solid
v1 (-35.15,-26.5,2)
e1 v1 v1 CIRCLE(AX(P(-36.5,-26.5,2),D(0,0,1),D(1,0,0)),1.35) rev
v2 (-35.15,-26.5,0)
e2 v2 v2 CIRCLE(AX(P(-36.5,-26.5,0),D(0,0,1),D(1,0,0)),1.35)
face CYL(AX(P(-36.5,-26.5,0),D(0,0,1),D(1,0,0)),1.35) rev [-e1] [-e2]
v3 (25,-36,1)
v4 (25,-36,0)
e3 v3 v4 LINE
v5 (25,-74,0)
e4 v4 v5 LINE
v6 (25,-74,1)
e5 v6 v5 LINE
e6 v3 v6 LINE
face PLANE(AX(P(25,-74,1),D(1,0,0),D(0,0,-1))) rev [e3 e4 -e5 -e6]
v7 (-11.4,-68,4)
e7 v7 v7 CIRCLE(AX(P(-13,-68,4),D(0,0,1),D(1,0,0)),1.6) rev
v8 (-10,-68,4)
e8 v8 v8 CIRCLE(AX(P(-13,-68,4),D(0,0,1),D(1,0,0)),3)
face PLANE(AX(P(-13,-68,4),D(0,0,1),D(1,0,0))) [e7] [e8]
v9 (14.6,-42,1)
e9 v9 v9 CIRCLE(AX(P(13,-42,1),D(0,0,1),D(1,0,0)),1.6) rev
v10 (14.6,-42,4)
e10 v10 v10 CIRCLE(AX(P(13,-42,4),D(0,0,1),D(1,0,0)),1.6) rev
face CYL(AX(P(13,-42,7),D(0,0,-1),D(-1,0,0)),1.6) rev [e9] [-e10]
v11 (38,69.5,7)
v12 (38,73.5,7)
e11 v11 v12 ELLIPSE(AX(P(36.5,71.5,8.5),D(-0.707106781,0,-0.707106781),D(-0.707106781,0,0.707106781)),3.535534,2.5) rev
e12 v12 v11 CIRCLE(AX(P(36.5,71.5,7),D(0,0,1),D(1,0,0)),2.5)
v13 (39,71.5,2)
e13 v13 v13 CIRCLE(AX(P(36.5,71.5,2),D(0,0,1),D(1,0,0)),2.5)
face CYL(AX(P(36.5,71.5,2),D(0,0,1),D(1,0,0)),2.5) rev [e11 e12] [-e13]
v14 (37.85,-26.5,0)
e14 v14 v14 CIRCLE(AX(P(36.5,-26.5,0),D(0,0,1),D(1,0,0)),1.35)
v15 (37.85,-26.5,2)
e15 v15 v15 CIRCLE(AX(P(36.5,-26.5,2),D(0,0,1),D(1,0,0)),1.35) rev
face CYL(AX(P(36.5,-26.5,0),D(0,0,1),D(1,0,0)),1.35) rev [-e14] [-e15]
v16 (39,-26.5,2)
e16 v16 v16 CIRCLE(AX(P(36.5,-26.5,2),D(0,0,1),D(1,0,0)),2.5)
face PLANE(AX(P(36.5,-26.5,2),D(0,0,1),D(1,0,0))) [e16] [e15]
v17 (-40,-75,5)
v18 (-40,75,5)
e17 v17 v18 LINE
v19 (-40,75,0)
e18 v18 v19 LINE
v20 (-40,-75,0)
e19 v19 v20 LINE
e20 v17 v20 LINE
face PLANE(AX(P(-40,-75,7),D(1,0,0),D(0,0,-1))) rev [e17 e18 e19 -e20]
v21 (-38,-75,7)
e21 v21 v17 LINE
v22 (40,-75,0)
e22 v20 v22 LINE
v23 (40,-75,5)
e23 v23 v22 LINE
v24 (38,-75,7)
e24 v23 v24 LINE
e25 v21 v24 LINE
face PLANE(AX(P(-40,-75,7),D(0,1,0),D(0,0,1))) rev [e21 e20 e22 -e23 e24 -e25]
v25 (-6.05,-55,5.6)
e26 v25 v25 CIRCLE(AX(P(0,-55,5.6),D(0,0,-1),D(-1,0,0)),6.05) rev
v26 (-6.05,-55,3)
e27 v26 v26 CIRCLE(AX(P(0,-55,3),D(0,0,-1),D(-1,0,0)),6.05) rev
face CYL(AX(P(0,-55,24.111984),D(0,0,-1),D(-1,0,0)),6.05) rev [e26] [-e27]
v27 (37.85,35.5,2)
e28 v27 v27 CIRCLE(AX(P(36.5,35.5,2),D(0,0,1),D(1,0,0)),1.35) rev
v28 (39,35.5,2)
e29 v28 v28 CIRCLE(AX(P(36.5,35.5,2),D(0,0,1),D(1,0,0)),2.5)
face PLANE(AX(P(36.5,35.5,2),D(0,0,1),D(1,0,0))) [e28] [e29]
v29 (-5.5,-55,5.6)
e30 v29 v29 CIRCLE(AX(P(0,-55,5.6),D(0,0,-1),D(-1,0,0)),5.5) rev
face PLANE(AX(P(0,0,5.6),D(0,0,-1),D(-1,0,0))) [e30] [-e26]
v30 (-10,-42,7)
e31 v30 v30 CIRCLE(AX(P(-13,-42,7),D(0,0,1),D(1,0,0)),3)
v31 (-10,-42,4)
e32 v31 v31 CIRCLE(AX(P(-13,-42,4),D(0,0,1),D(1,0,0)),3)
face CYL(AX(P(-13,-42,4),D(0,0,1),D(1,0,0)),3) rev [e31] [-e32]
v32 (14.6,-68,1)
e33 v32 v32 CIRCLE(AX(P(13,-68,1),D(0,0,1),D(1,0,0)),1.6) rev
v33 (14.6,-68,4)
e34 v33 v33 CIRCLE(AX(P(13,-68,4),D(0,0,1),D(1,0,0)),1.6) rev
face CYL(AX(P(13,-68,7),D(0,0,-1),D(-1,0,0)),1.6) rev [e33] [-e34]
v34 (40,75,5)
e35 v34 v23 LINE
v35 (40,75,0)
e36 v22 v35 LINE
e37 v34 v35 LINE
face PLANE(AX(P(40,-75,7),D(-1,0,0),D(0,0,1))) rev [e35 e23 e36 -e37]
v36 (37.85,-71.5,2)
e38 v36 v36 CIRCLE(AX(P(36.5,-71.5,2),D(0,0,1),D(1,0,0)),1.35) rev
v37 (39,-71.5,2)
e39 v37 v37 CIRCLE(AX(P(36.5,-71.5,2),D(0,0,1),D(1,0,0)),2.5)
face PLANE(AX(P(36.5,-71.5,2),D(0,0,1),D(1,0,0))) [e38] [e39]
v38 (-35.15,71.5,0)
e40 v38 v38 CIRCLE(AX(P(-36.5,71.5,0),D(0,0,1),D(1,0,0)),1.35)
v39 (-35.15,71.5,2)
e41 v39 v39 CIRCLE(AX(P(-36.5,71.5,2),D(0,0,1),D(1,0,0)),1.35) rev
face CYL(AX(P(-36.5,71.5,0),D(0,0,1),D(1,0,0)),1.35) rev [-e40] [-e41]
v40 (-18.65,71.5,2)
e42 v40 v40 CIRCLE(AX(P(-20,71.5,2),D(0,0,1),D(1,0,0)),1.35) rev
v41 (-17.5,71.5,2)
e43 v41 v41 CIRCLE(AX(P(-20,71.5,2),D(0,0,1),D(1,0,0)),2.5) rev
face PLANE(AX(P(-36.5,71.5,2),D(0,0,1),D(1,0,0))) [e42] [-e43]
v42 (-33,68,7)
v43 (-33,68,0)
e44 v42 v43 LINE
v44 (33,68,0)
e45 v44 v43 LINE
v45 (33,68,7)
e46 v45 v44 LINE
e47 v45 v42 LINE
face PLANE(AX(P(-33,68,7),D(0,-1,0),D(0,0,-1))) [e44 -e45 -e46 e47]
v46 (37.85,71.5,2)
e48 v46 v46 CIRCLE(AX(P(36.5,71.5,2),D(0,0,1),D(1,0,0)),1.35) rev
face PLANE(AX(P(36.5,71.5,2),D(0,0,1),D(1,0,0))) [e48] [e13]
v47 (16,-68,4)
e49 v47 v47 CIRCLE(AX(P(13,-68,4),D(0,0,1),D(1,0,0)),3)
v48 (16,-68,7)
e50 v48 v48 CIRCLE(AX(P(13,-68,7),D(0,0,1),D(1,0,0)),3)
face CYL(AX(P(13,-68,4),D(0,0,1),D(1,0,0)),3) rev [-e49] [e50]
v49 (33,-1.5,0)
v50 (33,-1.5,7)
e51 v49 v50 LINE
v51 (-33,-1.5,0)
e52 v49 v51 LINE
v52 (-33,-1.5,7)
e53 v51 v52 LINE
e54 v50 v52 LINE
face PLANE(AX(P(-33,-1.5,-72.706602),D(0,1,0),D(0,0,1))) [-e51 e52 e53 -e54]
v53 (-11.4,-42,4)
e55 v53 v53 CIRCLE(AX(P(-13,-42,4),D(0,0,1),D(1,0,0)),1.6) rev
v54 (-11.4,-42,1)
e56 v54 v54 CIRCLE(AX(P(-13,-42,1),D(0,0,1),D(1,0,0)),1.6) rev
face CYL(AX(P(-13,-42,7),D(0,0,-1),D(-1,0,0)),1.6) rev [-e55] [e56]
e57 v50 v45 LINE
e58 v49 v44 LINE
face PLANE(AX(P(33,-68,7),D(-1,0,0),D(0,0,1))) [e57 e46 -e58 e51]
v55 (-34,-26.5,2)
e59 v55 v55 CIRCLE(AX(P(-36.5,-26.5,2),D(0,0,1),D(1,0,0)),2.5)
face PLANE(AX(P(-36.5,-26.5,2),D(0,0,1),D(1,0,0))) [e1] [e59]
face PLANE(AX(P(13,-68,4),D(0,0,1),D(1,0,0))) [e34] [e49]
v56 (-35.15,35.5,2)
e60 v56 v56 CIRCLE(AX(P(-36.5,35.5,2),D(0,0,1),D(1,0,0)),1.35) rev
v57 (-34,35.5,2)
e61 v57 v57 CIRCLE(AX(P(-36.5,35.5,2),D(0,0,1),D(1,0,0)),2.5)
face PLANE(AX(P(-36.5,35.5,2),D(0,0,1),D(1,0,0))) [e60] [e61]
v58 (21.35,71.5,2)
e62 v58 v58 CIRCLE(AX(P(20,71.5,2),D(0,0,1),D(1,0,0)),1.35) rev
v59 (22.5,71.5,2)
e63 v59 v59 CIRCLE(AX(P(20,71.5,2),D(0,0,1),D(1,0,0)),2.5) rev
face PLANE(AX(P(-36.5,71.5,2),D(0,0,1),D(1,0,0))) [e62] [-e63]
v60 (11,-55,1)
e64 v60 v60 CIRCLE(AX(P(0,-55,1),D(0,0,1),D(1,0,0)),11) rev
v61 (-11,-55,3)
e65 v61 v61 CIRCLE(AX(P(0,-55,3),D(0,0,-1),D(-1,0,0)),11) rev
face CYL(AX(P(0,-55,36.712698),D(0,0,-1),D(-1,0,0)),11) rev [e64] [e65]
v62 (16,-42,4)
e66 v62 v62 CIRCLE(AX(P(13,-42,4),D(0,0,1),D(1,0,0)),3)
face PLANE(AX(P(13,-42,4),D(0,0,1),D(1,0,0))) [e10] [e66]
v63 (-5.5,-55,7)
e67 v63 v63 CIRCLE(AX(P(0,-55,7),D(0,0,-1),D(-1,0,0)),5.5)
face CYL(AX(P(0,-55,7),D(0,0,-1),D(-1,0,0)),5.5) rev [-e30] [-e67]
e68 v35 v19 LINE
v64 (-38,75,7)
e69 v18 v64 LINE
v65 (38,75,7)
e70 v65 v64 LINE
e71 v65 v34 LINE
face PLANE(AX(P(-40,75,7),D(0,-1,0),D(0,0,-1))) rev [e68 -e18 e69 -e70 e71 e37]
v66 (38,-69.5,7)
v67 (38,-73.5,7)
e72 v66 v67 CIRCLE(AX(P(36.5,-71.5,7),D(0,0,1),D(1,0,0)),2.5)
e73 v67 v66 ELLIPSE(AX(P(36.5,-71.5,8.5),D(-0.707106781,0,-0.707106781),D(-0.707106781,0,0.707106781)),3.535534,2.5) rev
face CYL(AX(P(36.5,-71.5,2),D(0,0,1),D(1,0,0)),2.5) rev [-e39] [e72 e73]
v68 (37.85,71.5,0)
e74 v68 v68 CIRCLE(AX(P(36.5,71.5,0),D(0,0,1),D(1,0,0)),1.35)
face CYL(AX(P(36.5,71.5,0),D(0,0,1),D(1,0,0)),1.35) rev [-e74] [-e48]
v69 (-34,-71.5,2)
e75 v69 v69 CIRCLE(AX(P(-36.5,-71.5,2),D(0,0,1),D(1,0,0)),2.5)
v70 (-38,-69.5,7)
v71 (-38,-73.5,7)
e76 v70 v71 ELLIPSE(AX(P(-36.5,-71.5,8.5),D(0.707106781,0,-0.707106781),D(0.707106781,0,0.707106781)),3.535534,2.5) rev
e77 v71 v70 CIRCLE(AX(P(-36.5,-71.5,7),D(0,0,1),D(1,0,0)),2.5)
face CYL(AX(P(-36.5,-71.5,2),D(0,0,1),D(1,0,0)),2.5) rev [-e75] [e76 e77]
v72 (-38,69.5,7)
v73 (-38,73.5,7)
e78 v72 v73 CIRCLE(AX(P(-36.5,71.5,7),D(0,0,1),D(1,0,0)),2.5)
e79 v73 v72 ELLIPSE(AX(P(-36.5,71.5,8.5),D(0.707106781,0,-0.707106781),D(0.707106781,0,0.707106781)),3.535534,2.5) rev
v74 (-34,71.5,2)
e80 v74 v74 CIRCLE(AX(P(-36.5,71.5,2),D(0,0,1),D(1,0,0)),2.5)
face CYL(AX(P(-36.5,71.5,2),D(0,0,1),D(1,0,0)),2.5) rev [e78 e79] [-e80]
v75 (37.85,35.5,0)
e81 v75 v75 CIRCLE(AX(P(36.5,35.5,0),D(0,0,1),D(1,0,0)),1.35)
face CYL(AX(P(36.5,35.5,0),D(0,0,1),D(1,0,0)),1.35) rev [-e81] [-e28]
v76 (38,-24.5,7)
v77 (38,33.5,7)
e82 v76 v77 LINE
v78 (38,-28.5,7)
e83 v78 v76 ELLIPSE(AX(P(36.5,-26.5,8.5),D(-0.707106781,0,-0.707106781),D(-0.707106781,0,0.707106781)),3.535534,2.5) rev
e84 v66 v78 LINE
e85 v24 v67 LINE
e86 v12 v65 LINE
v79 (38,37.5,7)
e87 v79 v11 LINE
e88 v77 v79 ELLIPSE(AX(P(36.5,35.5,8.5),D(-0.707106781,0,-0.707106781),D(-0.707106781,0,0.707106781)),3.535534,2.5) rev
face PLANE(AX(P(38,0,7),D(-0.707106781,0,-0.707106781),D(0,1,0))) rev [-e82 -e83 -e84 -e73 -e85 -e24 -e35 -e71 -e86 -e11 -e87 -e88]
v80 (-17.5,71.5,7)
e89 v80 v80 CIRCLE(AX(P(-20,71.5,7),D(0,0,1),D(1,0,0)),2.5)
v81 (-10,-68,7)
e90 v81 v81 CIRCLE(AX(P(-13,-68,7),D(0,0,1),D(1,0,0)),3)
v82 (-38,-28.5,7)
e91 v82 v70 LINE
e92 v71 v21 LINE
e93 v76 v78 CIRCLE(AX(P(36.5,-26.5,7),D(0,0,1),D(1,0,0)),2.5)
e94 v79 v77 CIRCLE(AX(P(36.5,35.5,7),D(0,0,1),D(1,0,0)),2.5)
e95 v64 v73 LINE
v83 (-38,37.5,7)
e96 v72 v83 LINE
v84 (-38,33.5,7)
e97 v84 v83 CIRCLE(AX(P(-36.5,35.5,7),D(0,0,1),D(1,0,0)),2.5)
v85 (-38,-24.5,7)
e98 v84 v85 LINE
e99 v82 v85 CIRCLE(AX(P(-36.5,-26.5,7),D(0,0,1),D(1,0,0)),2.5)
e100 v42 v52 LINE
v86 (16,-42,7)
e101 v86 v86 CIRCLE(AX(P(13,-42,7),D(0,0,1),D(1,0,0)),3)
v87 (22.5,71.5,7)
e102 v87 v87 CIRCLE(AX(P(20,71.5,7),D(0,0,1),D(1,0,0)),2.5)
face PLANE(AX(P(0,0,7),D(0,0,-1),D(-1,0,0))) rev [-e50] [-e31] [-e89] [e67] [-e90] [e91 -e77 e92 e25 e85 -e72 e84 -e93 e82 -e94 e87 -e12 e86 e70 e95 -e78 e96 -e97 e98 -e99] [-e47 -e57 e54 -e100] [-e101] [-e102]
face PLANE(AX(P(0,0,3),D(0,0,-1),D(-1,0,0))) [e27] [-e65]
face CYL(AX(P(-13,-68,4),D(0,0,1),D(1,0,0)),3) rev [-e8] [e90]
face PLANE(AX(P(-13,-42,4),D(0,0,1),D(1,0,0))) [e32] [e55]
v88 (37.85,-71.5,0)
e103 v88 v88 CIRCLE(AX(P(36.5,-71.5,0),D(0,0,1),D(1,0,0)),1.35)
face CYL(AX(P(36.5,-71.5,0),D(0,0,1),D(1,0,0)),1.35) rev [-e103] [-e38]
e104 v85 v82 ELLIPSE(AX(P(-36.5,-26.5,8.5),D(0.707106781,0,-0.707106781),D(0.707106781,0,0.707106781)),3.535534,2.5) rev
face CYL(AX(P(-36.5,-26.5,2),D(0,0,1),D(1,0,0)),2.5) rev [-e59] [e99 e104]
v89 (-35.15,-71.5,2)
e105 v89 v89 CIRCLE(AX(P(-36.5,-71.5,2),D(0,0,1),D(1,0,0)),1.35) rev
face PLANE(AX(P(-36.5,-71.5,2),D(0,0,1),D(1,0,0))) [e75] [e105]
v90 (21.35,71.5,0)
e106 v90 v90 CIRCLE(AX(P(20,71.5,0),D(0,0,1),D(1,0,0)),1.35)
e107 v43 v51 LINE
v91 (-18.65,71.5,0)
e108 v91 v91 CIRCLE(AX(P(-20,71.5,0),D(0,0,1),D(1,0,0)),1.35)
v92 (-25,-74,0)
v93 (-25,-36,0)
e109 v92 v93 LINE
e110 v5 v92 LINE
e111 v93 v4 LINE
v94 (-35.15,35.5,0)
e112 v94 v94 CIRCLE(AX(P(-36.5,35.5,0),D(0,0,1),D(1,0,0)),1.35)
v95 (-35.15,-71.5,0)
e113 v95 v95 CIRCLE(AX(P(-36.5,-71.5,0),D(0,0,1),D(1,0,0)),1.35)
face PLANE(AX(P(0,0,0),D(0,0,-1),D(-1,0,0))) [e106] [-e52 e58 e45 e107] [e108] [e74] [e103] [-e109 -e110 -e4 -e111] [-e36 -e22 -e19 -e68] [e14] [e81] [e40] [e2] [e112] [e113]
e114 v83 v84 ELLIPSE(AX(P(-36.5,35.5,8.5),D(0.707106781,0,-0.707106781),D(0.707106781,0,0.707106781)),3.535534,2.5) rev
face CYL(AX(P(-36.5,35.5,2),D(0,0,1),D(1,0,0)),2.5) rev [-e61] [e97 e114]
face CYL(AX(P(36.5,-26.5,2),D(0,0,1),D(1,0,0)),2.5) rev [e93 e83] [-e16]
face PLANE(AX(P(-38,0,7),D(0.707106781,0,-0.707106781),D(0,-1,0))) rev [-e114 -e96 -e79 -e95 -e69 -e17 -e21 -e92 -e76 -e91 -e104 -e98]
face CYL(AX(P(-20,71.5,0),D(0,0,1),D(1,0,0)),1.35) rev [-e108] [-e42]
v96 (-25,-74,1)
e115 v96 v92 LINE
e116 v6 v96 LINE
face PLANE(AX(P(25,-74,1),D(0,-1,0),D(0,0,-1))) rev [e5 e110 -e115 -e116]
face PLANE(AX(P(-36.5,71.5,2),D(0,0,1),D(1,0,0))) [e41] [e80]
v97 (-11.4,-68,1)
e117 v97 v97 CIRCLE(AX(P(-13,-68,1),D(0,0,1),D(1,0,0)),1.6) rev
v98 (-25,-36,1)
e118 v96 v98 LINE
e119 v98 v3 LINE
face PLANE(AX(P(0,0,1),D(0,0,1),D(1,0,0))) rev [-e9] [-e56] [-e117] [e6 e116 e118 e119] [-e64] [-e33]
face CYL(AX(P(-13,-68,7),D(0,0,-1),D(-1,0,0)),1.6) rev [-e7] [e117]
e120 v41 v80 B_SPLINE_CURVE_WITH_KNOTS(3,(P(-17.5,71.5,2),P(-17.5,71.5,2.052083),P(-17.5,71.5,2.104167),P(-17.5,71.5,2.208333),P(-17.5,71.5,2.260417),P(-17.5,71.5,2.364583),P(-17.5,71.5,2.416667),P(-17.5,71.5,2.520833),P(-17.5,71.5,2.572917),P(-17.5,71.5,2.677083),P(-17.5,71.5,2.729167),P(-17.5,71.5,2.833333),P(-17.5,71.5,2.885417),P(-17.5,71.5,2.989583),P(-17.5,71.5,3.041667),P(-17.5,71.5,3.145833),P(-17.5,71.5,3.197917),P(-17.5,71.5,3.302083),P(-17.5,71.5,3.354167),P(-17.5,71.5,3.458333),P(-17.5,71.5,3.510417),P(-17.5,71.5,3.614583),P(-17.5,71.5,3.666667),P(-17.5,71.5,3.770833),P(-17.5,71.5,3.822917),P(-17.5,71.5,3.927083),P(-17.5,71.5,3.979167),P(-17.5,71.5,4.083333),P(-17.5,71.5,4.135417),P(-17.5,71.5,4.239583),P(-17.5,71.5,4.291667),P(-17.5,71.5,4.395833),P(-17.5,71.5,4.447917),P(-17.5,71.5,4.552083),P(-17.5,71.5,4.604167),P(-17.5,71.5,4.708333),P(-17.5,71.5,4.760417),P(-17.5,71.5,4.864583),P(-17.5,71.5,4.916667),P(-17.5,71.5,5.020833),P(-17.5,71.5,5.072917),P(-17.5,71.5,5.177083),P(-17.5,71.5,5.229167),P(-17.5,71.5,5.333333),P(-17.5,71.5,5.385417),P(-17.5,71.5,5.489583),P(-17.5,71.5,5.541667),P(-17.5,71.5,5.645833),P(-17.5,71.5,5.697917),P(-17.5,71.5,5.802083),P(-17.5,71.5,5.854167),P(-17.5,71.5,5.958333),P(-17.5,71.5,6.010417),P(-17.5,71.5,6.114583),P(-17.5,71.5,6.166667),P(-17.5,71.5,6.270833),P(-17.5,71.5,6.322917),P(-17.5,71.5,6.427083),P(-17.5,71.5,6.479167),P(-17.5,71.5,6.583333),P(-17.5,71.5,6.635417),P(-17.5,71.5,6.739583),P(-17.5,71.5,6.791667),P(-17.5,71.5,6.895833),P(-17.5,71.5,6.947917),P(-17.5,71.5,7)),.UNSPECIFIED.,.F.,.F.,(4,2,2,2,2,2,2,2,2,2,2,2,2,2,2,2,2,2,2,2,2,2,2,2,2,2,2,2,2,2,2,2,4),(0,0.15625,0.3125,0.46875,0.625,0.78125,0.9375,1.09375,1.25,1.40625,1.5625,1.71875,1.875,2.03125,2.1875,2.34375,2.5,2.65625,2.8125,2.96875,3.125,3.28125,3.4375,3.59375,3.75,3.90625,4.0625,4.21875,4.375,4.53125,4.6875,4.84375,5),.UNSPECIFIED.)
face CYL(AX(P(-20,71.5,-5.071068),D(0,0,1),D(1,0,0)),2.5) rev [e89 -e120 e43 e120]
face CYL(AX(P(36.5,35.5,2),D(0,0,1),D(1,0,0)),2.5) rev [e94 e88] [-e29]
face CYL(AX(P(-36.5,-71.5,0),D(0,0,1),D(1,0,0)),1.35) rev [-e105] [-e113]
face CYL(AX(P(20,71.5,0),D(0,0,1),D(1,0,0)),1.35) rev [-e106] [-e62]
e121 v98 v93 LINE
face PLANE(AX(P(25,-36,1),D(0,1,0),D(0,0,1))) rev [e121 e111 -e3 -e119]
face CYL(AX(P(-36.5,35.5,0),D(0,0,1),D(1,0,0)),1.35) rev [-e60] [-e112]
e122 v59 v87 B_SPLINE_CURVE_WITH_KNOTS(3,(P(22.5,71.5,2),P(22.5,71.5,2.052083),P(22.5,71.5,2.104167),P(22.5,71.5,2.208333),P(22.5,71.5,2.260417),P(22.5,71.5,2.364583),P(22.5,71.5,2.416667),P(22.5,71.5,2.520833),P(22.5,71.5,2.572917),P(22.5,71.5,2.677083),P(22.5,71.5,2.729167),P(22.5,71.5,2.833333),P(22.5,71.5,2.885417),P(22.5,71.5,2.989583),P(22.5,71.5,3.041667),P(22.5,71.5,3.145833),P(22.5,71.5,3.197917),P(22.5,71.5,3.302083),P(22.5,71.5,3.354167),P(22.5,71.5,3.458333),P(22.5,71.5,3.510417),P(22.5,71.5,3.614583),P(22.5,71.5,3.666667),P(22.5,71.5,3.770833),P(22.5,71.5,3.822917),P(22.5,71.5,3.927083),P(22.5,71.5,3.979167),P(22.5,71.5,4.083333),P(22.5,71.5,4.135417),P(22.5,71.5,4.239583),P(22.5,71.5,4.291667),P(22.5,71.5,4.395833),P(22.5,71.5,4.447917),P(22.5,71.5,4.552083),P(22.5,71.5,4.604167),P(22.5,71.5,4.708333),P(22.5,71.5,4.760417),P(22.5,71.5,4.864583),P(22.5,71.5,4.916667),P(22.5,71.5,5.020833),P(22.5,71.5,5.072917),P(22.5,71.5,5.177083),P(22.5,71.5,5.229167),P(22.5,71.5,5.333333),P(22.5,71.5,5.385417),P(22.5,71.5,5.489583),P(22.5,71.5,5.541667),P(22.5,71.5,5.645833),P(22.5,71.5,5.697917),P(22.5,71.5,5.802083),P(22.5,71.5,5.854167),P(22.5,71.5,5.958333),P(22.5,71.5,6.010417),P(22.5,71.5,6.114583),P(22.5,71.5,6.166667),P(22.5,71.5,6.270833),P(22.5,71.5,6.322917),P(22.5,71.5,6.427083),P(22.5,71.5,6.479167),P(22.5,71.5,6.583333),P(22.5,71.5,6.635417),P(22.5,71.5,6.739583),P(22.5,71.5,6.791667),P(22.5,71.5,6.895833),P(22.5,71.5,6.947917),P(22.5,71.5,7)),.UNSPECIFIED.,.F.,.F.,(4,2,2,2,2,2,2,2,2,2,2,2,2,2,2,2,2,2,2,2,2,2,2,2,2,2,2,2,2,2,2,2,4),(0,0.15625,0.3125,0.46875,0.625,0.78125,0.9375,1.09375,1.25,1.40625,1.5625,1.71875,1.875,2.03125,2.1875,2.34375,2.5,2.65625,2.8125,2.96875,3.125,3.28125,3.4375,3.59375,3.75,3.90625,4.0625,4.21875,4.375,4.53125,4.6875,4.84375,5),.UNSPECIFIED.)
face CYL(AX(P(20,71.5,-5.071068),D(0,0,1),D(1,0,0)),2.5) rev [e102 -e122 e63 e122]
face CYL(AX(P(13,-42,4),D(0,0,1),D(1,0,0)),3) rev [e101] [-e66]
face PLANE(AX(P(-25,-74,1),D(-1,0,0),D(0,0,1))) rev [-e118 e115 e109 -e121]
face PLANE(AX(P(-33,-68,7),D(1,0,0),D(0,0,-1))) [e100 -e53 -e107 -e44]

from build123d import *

# Parameters (mm, degrees)
SKETCH1_W           = 80
SKETCH1_H           = 150
SKETCH1_W_2         = 66
SKETCH1_H_2         = 136
BOSS_EXTRUDE1_DEPTH = 7
SKETCH2_W           = 66
SKETCH2_H           = 36
BOSS_EXTRUDE2_DEPTH = 7
SKETCH3_R           = 5.5
CUT_EXTRUDE1_DEPTH  = 86.287748241
SKETCH4_R           = 6.05
CUT_EXTRUDE2_DEPTH  = 5.6
SKETCH5_R           = 11
CUT_EXTRUDE3_DEPTH  = 3
SKETCH6_R           = 1.6
CUT_EXTRUDE4_DEPTH  = 86.287748241
SKETCH7_W           = 50
SKETCH7_H           = 38
CUT_EXTRUDE5_DEPTH  = 1
SKETCH8_R           = 3
CUT_EXTRUDE6_DEPTH  = 3
SKETCH9_R           = 1.35
CUT_EXTRUDE7_DEPTH  = 86.287748241
SKETCH10_R          = 2.5
CUT_EXTRUDE8_DEPTH  = 5
CHAMFER1_SIZE       = 2
SKETCH11_W          = 66
SKETCH11_H          = 30.5
BOSS_EXTRUDE3_DEPTH = 7
SKETCH12_R          = 1.35
CUT_EXTRUDE9_DEPTH  = 86.287748241
SKETCH13_R          = 2.5
CUT_EXTRUDE10_DEPTH = 5


with BuildPart() as part:
    # Sketch1 → Boss-Extrude1 (new body)
    with BuildSketch(Plane.XY):
        Rectangle(SKETCH1_W, SKETCH1_H)
        Rectangle(SKETCH1_W_2, SKETCH1_H_2, mode=Mode.SUBTRACT)
    extrude(amount=BOSS_EXTRUDE1_DEPTH)

    # Sketch2 → Boss-Extrude2 (add)
    with BuildSketch(Plane.XY.offset(7)):
        with Locations((0, -50)):
            Rectangle(SKETCH2_W, SKETCH2_H)
    extrude(amount=-BOSS_EXTRUDE2_DEPTH)

    # Sketch3 → Cut-Extrude1 (cut, through all)
    with BuildSketch(Plane(origin=(0, 0, 0), x_dir=(-1, 0, 0), z_dir=(0, 0, -1))):
        with Locations((0, -55)):
            Circle(SKETCH3_R)
    extrude(amount=-CUT_EXTRUDE1_DEPTH, mode=Mode.SUBTRACT)

    # Sketch4 → Cut-Extrude2 (cut)
    with BuildSketch(Plane(origin=(0, 0, 0), x_dir=(-1, 0, 0), z_dir=(0, 0, -1))):
        with Locations((0, -55)):
            Circle(SKETCH4_R)
    extrude(amount=-CUT_EXTRUDE2_DEPTH, mode=Mode.SUBTRACT)

    # Sketch5 → Cut-Extrude3 (cut)
    with BuildSketch(Plane(origin=(0, 0, 0), x_dir=(-1, 0, 0), z_dir=(0, 0, -1))):
        with Locations((0, -55)):
            Circle(SKETCH5_R)
    extrude(amount=-CUT_EXTRUDE3_DEPTH, mode=Mode.SUBTRACT)

    # Sketch6 → Cut-Extrude4 (cut, through all)
    with BuildSketch(Plane(origin=(0, 0, 0), x_dir=(-1, 0, 0), z_dir=(0, 0, -1))):
        with Locations((-13, -42)):
            Circle(SKETCH6_R)
        with Locations((13, -42)):
            Circle(SKETCH6_R)
        with Locations((13, -68)):
            Circle(SKETCH6_R)
        with Locations((-13, -68)):
            Circle(SKETCH6_R)
    extrude(amount=-CUT_EXTRUDE4_DEPTH, mode=Mode.SUBTRACT)

    # Sketch7 → Cut-Extrude5 (cut)
    with BuildSketch(Plane(origin=(0, 0, 0), x_dir=(-1, 0, 0), z_dir=(0, 0, -1))):
        with Locations((0, -55)):
            Rectangle(SKETCH7_W, SKETCH7_H)
    extrude(amount=-CUT_EXTRUDE5_DEPTH, mode=Mode.SUBTRACT)

    # Sketch8 → Cut-Extrude6 (cut)
    with BuildSketch(Plane.XY.offset(7)):
        with Locations((-13, -42)):
            Circle(SKETCH8_R)
        with Locations((13, -42)):
            Circle(SKETCH8_R)
        with Locations((13, -68)):
            Circle(SKETCH8_R)
        with Locations((-13, -68)):
            Circle(SKETCH8_R)
    extrude(amount=-CUT_EXTRUDE6_DEPTH, mode=Mode.SUBTRACT)

    # Sketch9 → Cut-Extrude7 (cut, through all)
    with BuildSketch(Plane.XY.offset(7)):
        with Locations((-36.5, 71.5)):
            Circle(SKETCH9_R)
        with Locations((36.5, 71.5)):
            Circle(SKETCH9_R)
        with Locations((-36.5, -71.5)):
            Circle(SKETCH9_R)
        with Locations((36.5, -71.5)):
            Circle(SKETCH9_R)
        with Locations((-36.5, 35.5)):
            Circle(SKETCH9_R)
        with Locations((36.5, 35.5)):
            Circle(SKETCH9_R)
        with Locations((36.5, -26.5)):
            Circle(SKETCH9_R)
        with Locations((-36.5, -26.5)):
            Circle(SKETCH9_R)
    extrude(amount=-CUT_EXTRUDE7_DEPTH, mode=Mode.SUBTRACT)

    # Sketch10 → Cut-Extrude8 (cut)
    with BuildSketch(Plane.XY.offset(7)):
        with Locations((-36.5, 71.5)):
            Circle(SKETCH10_R)
        with Locations((36.5, 35.5)):
            Circle(SKETCH10_R)
        with Locations((-36.5, 35.5)):
            Circle(SKETCH10_R)
        with Locations((36.5, 71.5)):
            Circle(SKETCH10_R)
        with Locations((-36.5, -71.5)):
            Circle(SKETCH10_R)
        with Locations((36.5, -71.5)):
            Circle(SKETCH10_R)
        with Locations((-36.5, -26.5)):
            Circle(SKETCH10_R)
        with Locations((36.5, -26.5)):
            Circle(SKETCH10_R)
    extrude(amount=-CUT_EXTRUDE8_DEPTH, mode=Mode.SUBTRACT)

    # Chamfer1
    # the kernel refuses this chamfer: 2 mm, written as the material it takes off along each edge
    with BuildSketch(Plane(origin=(-40, 80.143365976, 7), x_dir=(-0.027495876610585623, 0, -0.9996219169112968), z_dir=(0, -1, 0)), Plane(origin=(40, -80.143365976, 7), x_dir=(0.027495876610585623, 0, -0.9996219169112968), z_dir=(0, 1, 0))) as chamfer1_piece_1:
        Polygon((CHAMFER1_SIZE * 0.999621916911, CHAMFER1_SIZE * 0.0274958766106), (-CHAMFER1_SIZE * 0.0274958766106, CHAMFER1_SIZE * 0.999621916911), (0, 0), align=None)
    extrude(amount=160.286731952, mode=Mode.SUBTRACT)

    # Sketch11 → Boss-Extrude3 (add)
    with BuildSketch(Plane.XY.offset(7)):
        with Locations((0, -16.75)):
            Rectangle(SKETCH11_W, SKETCH11_H)
    extrude(amount=-BOSS_EXTRUDE3_DEPTH)

    # Sketch12 → Cut-Extrude9 (cut, through all)
    with BuildSketch(Plane.XY.offset(7)):
        with Locations((-20, 71.5)):
            Circle(SKETCH12_R)
        with Locations((20, 71.5)):
            Circle(SKETCH12_R)
    extrude(amount=-CUT_EXTRUDE9_DEPTH, mode=Mode.SUBTRACT)

    # Sketch13 → Cut-Extrude10 (cut)
    with BuildSketch(Plane.XY.offset(7)):
        with Locations((-20, 71.5)):
            Circle(SKETCH13_R)
        with Locations((20, 71.5)):
            Circle(SKETCH13_R)
    extrude(amount=-CUT_EXTRUDE10_DEPTH, mode=Mode.SUBTRACT)


solid = part.part
